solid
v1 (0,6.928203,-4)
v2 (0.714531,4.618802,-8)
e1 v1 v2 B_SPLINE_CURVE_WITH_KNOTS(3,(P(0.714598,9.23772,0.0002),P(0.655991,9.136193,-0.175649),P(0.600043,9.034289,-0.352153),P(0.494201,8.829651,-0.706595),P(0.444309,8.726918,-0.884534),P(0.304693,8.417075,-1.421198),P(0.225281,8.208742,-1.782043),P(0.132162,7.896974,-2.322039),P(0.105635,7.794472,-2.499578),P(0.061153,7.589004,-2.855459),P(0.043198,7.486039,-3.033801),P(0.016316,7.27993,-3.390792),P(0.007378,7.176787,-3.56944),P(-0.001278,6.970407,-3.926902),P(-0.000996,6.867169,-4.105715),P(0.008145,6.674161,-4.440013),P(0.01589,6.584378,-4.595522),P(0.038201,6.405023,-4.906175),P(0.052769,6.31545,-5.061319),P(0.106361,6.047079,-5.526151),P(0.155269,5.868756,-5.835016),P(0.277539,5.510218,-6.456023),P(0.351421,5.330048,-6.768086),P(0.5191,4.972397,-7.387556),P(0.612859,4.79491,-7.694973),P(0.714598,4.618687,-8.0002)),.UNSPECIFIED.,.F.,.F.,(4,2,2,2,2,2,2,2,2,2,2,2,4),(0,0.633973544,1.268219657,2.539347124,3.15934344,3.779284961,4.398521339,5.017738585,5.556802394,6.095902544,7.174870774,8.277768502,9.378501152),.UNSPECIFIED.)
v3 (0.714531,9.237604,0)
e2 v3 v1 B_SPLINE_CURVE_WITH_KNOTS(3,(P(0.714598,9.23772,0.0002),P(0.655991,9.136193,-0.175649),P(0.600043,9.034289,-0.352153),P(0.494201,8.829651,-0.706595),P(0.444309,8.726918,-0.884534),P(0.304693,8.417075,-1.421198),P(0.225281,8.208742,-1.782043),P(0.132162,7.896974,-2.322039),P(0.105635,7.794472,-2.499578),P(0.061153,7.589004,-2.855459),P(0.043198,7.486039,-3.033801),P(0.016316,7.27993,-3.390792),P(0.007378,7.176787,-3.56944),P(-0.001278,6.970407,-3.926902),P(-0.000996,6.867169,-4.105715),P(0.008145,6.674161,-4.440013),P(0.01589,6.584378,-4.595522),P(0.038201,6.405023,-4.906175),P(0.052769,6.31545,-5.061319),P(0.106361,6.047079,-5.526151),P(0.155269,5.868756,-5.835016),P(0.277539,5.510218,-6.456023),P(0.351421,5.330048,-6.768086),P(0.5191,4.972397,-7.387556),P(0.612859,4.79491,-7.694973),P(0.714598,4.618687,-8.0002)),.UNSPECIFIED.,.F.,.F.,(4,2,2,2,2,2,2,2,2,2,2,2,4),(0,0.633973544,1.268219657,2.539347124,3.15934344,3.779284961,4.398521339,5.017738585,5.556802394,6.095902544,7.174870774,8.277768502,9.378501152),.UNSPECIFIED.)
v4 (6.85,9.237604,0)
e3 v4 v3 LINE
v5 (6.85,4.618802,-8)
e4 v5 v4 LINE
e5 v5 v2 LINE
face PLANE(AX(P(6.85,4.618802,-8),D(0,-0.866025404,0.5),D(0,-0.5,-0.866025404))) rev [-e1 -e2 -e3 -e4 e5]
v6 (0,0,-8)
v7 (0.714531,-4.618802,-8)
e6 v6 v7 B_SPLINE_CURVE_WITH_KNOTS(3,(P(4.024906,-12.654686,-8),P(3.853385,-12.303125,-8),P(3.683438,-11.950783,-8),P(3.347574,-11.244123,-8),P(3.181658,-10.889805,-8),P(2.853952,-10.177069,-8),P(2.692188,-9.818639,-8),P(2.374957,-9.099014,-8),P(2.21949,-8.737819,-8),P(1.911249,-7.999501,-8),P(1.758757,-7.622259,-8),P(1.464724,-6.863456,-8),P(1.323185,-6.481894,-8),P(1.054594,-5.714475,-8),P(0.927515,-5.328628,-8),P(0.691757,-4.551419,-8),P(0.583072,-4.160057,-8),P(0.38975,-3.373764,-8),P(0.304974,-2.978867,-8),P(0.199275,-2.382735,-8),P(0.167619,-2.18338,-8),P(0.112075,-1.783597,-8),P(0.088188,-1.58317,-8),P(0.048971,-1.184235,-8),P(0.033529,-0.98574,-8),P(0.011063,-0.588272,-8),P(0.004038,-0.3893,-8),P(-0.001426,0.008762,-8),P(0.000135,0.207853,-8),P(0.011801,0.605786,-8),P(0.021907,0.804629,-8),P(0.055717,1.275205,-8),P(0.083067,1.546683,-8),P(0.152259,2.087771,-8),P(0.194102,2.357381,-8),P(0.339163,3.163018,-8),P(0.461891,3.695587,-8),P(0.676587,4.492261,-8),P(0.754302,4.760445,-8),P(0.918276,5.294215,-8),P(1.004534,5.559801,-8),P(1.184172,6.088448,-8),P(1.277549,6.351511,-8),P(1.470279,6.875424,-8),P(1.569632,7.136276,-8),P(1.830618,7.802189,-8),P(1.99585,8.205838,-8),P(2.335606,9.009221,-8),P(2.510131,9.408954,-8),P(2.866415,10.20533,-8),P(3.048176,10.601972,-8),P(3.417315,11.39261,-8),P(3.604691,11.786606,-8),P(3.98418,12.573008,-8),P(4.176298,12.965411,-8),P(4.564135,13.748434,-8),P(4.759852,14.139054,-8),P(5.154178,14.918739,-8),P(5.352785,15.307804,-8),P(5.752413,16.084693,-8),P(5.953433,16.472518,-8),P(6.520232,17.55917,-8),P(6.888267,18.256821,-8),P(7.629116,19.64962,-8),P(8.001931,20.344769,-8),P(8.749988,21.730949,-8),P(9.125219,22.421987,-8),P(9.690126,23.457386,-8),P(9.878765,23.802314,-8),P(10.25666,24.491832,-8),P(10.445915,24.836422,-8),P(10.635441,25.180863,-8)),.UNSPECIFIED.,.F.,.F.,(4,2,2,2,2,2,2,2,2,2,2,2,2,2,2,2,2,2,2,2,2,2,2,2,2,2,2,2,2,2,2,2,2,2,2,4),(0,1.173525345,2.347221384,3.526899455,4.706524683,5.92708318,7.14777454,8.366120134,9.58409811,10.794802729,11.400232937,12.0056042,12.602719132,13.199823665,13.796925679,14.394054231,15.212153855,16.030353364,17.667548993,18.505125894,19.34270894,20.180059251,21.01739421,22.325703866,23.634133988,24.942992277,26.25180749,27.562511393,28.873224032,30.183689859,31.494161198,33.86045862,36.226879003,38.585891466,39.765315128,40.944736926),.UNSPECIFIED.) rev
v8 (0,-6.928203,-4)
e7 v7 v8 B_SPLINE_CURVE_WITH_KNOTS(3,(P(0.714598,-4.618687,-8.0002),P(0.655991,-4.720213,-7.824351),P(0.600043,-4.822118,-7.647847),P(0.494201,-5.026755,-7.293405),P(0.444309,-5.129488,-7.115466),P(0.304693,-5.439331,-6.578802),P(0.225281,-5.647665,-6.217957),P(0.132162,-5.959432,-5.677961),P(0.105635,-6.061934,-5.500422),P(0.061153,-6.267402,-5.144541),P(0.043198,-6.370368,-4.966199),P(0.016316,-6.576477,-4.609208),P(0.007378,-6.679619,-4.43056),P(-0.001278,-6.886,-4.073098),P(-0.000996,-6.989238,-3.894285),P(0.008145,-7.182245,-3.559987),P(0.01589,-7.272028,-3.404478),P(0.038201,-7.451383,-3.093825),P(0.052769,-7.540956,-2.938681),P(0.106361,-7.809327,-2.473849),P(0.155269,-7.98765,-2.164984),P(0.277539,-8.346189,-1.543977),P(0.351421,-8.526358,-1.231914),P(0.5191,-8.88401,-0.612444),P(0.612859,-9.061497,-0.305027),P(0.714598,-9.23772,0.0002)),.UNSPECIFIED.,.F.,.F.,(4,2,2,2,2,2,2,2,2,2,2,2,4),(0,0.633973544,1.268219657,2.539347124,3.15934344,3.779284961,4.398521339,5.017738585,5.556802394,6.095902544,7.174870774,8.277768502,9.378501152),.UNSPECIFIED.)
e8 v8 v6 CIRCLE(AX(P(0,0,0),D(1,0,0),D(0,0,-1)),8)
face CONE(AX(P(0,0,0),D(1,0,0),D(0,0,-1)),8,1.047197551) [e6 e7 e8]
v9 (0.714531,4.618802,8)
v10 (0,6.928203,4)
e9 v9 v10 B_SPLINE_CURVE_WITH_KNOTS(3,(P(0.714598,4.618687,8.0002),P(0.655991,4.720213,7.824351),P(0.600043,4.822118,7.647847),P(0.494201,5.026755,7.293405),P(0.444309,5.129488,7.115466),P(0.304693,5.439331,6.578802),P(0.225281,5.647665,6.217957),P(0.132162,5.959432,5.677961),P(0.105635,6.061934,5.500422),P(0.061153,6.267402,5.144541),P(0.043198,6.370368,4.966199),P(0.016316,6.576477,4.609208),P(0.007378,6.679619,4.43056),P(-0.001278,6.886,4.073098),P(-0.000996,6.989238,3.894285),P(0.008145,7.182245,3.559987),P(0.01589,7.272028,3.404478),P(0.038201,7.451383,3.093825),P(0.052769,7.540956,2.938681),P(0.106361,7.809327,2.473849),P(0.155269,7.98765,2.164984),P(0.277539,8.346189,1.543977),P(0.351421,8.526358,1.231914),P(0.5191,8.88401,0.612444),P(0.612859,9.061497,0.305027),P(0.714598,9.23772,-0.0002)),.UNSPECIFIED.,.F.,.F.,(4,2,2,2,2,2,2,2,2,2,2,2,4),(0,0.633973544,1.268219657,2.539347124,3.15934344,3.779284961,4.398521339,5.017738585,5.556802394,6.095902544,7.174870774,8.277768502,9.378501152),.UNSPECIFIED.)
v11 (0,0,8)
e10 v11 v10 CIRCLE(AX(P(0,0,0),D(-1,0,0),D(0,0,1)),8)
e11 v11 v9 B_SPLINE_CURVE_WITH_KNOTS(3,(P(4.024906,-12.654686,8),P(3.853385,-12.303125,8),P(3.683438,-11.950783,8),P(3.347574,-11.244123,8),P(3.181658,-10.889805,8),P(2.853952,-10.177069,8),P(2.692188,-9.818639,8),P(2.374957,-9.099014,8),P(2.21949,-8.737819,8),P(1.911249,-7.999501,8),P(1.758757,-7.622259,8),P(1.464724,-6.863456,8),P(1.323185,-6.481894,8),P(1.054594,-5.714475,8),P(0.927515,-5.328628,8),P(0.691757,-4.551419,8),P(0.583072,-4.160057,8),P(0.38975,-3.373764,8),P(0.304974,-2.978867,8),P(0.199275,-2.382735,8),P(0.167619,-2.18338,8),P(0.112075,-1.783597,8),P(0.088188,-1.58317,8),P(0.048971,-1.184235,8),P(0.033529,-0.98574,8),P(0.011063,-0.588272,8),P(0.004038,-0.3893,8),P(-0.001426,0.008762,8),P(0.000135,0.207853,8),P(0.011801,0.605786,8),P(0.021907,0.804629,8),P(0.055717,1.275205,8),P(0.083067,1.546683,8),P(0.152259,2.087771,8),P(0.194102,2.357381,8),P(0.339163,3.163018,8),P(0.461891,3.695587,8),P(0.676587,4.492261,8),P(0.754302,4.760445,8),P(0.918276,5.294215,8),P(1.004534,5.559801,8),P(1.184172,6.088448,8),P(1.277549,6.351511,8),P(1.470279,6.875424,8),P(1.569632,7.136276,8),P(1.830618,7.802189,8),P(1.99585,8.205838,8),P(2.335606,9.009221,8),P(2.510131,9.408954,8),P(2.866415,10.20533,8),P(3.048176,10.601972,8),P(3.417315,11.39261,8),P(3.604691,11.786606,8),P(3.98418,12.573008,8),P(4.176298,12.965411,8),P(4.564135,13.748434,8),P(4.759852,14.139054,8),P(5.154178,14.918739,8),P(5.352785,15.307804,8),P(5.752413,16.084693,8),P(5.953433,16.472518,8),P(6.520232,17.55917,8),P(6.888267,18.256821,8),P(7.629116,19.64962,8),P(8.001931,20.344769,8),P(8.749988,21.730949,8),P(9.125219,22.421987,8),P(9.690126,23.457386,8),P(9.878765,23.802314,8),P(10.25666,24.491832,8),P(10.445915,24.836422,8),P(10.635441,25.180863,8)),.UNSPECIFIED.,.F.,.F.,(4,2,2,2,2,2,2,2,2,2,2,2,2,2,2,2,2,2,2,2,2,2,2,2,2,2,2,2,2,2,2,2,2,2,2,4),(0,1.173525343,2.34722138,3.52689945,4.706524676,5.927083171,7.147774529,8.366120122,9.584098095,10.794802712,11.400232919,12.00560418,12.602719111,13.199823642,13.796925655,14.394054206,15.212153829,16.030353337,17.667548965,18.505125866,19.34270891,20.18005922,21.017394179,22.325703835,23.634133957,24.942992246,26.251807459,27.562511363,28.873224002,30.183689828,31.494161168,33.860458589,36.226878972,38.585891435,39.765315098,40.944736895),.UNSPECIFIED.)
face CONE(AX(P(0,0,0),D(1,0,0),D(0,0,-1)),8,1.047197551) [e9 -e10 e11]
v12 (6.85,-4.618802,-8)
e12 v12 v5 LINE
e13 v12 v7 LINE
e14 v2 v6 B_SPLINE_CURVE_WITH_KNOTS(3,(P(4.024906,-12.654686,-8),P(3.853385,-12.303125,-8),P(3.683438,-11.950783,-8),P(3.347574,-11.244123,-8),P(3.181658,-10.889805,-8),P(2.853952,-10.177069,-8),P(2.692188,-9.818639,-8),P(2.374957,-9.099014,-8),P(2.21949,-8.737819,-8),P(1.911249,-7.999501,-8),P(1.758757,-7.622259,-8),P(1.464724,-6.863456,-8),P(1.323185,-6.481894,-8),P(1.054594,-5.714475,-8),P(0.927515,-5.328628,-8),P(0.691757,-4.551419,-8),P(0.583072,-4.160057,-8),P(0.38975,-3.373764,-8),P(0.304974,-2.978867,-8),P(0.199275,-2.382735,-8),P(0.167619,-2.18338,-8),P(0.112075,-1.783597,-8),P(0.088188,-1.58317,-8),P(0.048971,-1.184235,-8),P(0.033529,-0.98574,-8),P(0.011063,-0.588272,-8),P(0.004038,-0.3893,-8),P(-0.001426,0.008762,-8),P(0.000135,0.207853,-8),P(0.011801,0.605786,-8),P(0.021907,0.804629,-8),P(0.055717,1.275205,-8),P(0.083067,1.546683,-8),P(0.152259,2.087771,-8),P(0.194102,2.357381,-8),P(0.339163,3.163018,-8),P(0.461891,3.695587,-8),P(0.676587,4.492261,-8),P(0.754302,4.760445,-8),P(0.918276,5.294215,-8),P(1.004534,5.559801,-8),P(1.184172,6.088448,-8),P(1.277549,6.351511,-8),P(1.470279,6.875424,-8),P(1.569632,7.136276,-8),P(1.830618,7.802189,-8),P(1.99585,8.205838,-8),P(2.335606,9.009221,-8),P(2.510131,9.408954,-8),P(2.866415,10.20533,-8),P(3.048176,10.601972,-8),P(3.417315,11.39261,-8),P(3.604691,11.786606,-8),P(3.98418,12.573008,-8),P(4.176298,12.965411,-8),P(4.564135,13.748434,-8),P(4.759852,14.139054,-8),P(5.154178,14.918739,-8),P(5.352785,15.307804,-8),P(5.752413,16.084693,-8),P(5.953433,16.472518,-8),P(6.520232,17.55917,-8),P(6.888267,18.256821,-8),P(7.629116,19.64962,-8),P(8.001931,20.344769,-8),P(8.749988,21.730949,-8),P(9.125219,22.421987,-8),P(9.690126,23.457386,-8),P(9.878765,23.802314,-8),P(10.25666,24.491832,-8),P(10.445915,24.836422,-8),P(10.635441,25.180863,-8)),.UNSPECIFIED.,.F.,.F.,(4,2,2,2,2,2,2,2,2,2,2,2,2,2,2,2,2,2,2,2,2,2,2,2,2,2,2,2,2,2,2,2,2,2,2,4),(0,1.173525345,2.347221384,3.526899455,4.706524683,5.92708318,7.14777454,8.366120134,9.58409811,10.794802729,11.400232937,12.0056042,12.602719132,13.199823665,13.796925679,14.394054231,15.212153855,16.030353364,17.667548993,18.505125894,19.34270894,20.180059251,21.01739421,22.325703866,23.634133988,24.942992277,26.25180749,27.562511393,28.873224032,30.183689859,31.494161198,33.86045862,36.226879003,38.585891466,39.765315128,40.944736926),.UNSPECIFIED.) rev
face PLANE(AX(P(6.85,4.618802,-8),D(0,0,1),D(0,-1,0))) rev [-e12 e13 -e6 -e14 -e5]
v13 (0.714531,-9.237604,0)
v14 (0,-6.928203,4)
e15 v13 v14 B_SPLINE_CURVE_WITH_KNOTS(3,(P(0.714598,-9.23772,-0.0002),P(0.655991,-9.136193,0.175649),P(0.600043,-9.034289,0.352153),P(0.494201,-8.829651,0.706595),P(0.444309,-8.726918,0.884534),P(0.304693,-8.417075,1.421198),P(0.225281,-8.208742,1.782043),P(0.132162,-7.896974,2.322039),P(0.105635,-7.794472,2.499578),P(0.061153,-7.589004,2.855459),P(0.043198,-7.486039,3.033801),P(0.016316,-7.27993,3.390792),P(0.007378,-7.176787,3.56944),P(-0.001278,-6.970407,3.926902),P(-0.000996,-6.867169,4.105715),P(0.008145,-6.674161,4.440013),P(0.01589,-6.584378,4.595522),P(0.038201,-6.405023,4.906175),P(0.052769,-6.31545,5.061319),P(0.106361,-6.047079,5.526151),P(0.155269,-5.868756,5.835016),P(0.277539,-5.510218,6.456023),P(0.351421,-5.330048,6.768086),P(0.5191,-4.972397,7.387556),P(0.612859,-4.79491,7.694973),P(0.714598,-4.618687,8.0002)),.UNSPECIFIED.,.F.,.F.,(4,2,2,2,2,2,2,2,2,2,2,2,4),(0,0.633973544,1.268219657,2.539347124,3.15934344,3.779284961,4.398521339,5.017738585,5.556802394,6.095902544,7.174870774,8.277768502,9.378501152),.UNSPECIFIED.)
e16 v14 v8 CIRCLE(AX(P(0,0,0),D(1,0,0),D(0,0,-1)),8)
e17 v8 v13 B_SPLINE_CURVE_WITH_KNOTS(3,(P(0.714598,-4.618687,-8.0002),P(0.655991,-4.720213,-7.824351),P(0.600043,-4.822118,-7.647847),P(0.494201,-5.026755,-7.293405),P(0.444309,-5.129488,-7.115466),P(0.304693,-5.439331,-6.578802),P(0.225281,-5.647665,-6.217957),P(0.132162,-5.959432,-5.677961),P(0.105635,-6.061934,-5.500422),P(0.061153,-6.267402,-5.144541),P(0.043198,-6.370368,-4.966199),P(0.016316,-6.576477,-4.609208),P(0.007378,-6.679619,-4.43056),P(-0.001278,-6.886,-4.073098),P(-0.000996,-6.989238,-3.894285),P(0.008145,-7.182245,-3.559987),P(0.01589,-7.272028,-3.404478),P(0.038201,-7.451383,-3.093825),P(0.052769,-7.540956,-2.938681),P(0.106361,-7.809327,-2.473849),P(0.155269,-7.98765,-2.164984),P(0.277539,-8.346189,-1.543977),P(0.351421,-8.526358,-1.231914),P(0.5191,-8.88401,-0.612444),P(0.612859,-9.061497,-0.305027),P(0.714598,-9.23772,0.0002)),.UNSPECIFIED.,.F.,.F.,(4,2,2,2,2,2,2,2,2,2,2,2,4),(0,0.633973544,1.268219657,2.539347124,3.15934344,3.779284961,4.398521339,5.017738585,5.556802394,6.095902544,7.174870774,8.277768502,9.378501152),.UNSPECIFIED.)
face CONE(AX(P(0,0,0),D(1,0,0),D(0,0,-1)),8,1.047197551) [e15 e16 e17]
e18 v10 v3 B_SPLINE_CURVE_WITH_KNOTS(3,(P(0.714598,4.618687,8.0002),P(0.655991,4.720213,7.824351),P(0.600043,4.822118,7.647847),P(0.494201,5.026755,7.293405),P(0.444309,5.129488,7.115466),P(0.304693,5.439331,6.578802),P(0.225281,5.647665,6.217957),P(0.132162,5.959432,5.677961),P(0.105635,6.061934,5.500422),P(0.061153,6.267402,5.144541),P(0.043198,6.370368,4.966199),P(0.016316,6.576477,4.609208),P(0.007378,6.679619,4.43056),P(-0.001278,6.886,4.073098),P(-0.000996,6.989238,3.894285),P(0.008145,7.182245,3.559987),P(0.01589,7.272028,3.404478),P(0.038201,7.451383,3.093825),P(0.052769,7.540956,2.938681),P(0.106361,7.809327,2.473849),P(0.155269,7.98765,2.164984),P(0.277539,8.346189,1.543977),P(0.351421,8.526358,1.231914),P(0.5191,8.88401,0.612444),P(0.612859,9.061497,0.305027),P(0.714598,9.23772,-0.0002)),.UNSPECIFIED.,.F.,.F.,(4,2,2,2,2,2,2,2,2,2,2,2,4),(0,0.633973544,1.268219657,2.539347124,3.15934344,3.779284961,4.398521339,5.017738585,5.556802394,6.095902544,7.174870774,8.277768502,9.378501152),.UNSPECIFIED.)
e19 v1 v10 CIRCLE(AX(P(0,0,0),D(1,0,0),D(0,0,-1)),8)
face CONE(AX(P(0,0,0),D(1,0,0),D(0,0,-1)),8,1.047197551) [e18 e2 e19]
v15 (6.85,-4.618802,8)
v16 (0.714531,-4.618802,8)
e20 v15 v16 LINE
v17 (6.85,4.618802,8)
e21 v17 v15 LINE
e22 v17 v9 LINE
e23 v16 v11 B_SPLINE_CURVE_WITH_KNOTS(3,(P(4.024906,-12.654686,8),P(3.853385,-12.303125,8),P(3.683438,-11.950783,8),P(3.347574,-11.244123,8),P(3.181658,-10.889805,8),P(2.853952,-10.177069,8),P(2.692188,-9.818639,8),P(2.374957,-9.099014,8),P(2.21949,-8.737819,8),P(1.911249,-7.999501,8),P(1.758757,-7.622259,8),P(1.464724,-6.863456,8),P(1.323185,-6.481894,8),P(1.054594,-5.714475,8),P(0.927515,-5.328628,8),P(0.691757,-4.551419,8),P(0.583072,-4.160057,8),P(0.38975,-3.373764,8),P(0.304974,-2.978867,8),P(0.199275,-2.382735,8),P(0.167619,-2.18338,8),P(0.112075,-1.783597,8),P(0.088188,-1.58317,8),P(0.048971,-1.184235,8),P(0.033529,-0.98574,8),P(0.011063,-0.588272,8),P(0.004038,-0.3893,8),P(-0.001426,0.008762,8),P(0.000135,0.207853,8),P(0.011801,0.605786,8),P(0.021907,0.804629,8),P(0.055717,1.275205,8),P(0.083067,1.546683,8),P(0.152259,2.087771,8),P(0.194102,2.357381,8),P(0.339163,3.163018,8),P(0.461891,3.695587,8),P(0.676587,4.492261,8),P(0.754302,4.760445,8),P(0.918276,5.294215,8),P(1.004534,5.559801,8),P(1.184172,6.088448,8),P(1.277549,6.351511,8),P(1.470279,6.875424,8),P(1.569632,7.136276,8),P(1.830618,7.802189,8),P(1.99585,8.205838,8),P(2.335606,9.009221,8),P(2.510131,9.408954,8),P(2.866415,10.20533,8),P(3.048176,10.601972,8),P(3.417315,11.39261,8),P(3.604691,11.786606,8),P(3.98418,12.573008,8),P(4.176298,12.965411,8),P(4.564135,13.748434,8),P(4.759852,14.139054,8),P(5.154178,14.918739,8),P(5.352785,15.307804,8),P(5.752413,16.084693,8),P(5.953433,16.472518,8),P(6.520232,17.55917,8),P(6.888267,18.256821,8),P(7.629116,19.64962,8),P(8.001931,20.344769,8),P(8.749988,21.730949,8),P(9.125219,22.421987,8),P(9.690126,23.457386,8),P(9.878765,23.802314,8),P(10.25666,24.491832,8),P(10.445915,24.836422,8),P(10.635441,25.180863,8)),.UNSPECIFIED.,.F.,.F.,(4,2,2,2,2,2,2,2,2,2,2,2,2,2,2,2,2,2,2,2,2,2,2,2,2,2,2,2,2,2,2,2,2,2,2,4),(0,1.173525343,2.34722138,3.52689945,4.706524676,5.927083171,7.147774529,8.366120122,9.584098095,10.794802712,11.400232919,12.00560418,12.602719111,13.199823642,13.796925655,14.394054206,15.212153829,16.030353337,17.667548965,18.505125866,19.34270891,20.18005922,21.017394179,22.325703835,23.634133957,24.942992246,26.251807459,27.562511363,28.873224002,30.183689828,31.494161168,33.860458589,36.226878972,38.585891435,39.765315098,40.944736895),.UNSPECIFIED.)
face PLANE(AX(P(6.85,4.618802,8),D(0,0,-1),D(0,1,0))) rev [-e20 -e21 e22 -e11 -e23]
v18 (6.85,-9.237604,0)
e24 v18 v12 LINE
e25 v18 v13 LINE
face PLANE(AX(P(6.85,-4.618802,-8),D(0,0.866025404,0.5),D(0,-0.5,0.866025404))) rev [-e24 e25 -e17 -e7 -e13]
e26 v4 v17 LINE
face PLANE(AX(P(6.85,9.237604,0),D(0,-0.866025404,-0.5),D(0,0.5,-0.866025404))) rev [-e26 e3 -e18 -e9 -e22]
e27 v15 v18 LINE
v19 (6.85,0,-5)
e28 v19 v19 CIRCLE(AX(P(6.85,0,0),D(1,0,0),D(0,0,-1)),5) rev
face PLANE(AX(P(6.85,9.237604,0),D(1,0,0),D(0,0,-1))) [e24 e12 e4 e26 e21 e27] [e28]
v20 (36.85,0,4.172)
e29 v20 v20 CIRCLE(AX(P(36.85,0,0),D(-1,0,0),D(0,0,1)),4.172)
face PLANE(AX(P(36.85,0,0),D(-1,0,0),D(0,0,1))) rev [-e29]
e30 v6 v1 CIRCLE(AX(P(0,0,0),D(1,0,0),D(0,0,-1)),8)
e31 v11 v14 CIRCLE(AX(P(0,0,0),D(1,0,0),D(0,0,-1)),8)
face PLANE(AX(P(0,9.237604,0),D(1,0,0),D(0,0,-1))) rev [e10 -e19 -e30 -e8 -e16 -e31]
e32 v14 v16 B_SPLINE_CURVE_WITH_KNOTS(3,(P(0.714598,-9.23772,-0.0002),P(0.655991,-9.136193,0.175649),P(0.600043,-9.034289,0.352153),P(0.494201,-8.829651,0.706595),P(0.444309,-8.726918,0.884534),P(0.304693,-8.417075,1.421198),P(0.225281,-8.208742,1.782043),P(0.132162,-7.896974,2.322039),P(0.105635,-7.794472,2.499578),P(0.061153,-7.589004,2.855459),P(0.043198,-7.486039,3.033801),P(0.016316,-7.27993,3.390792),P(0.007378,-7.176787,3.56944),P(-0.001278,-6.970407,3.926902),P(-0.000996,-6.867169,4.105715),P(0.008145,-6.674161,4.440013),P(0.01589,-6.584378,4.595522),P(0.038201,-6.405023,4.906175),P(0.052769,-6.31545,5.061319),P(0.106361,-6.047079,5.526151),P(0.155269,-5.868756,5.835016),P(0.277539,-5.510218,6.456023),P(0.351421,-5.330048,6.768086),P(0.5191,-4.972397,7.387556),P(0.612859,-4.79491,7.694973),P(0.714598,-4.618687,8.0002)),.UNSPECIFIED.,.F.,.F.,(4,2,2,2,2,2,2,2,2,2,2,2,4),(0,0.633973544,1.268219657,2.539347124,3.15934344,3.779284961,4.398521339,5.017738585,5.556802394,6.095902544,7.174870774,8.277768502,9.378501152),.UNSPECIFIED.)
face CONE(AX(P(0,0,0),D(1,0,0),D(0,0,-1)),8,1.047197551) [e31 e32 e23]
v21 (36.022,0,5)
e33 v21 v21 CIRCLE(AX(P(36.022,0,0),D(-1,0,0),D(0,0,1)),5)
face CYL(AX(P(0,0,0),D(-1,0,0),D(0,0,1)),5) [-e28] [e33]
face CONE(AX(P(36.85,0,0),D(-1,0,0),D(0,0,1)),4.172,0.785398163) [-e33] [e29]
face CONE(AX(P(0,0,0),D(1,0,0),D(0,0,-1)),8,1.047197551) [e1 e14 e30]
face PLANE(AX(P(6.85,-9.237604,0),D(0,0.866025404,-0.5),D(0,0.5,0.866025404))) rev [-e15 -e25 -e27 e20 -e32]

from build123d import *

# Parameters (mm, degrees)
BASEHEAD_DEPTH = 6.85


# Read off the part's stored shape, not the designer's step: HeadChamfer
with BuildPart() as part:
    # Sketch1 → BaseHead (new body)
    with BuildSketch(Plane(origin=(0, 0, 0), x_dir=(0, 0, -1), z_dir=(1, 0, 0))):
        Polygon((8, 4.618802154), (8, -4.618802154), (0, -9.237604307), (-8, -4.618802154), (-8, 4.618802154), (0, 9.237604307), align=None)
    extrude(amount=BASEHEAD_DEPTH)

    # HeadChamfer outline → HeadChamfer (revolve, cut)
    with BuildSketch(Plane.YX):
        Polygon((9.237604311, 0.714531182), (8, 0), (9.237604311, 0), align=None)
    revolve(axis=Axis((0, 0, 0), (1, 0, 0)), mode=Mode.SUBTRACT)

    # HeadChamfer 2 outline → HeadChamfer 2 (revolve)
    with BuildSketch(Plane.YX):
        Polygon((5, 6.85), (5, 36.022), (4.172, 36.85), (0, 36.85), (0, 6.85), align=None)
    revolve(axis=Axis((0, 0, 0), (1, 0, 0)))


solid = part.part
